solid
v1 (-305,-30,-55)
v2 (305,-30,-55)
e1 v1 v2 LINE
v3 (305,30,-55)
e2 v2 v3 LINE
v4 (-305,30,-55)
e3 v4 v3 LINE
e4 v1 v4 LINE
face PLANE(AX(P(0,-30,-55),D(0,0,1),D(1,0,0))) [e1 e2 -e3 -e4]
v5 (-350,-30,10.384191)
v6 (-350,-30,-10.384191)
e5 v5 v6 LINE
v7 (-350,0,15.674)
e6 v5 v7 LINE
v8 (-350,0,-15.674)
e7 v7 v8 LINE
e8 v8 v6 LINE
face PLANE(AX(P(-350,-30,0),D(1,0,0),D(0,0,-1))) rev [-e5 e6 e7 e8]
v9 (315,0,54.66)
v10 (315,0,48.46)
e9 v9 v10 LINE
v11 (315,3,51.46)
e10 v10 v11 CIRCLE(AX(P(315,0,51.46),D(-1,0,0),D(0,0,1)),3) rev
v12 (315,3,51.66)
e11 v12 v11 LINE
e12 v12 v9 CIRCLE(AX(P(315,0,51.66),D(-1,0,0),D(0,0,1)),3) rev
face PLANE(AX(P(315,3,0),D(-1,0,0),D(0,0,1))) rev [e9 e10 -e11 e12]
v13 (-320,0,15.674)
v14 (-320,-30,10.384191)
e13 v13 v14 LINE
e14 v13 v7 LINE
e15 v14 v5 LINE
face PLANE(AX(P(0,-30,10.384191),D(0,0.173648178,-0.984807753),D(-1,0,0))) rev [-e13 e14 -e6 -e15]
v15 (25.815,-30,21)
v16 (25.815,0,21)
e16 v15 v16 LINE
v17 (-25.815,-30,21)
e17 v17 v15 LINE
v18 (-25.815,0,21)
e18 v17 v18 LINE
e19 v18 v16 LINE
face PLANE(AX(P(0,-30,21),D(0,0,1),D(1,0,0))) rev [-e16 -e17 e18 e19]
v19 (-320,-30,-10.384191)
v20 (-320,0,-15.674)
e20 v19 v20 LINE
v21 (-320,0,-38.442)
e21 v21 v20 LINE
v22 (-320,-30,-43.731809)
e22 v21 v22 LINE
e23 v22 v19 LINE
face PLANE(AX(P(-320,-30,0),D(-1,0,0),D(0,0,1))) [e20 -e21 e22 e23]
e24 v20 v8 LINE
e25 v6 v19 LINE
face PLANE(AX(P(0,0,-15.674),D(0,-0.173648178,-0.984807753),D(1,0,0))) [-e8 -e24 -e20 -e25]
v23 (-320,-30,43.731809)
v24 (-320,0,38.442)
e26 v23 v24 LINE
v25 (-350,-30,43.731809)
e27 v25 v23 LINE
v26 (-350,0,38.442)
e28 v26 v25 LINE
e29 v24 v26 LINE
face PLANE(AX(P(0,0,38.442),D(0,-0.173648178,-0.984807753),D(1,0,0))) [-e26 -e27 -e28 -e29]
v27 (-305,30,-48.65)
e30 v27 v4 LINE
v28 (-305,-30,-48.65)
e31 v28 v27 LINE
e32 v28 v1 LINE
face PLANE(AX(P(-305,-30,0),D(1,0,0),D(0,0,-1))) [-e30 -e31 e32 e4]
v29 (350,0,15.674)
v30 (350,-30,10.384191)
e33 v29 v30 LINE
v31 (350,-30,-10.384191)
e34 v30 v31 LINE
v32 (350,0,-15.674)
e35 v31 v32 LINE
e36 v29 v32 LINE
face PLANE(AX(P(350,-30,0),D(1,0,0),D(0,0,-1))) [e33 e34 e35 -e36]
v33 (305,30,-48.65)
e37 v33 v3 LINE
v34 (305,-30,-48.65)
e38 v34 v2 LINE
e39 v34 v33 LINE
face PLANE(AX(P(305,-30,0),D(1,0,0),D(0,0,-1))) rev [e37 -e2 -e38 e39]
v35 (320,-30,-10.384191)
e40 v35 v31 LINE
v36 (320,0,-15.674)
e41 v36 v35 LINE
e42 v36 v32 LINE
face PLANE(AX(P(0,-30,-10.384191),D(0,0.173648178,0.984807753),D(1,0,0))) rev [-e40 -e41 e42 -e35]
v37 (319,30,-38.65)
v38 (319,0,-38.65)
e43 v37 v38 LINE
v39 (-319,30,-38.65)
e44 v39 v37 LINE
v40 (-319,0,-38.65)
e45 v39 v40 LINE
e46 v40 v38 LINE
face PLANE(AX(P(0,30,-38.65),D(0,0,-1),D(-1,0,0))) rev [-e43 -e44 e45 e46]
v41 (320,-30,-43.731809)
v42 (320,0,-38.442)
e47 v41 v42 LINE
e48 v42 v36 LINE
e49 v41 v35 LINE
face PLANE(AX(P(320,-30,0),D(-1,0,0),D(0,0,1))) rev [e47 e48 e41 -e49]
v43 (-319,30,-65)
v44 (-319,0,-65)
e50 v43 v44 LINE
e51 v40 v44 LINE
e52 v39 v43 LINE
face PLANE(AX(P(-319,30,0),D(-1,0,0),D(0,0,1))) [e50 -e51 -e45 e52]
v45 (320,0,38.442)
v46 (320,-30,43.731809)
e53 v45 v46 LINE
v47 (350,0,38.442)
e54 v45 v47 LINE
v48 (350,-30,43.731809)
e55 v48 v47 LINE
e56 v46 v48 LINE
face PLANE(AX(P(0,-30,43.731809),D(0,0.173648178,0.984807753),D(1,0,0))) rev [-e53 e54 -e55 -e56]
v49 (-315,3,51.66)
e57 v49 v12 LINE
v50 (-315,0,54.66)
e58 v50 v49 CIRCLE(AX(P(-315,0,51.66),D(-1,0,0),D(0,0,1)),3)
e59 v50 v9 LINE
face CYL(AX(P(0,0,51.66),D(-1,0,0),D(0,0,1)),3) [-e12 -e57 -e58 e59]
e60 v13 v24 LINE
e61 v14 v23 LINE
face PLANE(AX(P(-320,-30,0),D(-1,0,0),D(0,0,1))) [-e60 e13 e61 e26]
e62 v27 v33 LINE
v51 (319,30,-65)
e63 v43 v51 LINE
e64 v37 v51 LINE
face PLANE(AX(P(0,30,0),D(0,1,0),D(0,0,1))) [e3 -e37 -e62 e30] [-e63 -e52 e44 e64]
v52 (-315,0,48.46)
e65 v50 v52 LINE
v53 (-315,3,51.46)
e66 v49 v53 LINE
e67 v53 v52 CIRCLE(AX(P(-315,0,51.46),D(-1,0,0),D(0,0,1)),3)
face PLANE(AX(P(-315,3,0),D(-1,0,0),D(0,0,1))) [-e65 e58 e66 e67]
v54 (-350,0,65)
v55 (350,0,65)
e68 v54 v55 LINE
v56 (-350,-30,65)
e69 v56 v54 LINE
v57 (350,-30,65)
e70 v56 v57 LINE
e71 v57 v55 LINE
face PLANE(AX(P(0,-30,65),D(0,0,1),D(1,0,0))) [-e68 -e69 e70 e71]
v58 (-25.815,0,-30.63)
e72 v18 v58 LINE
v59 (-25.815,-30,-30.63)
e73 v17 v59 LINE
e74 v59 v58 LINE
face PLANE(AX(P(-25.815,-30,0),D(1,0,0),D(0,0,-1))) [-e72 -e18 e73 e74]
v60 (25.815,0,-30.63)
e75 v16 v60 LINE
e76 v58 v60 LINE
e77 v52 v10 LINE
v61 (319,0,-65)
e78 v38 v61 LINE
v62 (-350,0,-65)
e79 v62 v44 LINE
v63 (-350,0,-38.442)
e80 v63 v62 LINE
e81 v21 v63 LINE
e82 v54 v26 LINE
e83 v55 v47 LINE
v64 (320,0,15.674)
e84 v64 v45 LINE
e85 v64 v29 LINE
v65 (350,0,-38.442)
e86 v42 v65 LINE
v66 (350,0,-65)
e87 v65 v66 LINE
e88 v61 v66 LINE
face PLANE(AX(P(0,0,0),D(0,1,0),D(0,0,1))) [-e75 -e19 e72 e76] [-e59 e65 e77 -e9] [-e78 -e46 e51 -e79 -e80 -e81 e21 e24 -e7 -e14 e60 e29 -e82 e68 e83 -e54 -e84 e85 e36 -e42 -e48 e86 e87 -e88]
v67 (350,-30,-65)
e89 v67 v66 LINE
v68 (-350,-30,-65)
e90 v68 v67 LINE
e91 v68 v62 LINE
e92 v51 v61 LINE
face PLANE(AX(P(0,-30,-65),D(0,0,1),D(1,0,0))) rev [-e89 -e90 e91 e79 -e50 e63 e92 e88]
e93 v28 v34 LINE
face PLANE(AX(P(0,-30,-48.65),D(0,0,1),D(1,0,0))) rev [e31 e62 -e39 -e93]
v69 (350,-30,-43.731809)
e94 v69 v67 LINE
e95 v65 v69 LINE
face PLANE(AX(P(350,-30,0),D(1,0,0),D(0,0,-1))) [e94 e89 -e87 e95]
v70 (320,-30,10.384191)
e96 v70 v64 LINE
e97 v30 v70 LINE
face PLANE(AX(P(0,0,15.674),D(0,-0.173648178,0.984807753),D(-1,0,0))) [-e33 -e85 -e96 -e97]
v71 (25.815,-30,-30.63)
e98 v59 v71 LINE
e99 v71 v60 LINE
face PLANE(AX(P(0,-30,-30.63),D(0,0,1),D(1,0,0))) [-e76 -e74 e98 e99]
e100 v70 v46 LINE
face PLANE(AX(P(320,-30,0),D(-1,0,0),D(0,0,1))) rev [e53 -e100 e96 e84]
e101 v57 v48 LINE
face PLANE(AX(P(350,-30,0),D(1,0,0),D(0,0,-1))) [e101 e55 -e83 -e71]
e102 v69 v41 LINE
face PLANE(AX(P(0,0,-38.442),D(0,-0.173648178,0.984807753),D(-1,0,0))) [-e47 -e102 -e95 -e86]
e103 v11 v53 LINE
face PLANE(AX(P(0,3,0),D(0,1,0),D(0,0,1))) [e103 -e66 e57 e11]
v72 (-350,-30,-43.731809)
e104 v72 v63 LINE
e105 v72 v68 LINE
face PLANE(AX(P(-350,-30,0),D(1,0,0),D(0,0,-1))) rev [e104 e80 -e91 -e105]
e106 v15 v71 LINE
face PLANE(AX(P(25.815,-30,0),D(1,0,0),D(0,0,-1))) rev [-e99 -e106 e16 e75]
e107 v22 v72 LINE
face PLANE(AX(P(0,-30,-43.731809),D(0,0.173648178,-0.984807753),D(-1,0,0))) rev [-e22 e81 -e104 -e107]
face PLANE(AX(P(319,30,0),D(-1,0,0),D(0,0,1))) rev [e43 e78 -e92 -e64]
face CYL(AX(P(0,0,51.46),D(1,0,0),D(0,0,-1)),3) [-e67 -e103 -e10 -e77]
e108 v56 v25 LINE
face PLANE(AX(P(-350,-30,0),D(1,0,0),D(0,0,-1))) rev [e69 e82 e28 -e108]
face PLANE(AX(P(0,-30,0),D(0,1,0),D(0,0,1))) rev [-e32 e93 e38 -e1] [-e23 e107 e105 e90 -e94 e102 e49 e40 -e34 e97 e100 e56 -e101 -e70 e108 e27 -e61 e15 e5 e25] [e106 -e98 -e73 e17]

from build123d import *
from OCP.BRepFilletAPI import BRepFilletAPI_MakeChamfer

# Parameters (mm, degrees)
SKETCH2_W           = 51.63
SKETCH2_H           = 51.63
SKETCH2_W_2         = 610
SKETCH2_H_2         = 6.35
BOSS_EXTRUDE1_DEPTH = 30
SKETCH2_4_W         = 630
SKETCH2_4_H         = 6.2
BOSS_EXTRUDE3_DEPTH = 3
FILLET2_R           = 3
CHAMFER1_SIZE       = 30
CHAMFER1_SIZE_2     = 5.289809421
CHAMFER2_SIZE       = 30
CHAMFER2_SIZE_2     = 5.289809421
SKETCH2_7_W         = 638
SKETCH2_7_H         = 26.35
SKETCH2_7_W_2       = 610
SKETCH2_7_H_2       = 6.35
BOSS_EXTRUDE5_DEPTH = 30


with BuildPart() as part:
    # Sketch2 → Boss-Extrude1 (new body)
    with BuildSketch(Plane(origin=(0, 0, 0), x_dir=(1, 0, 0), z_dir=(0, 1, 0))):
        Polygon((-350, -38.442), (-350, -65), (350, -65), (350, -38.442), (320, -38.442), (320, -15.674), (350, -15.674), (350, 15.674), (320, 15.674), (320, 38.442), (350, 38.442), (350, 65), (-350, 65), (-350, 38.442), (-320, 38.442), (-320, 15.674), (-350, 15.674), (-350, -15.674), (-320, -15.674), (-320, -38.442), align=None)
        with Locations((0, 4.815)):
            Rectangle(SKETCH2_W, SKETCH2_H, mode=Mode.SUBTRACT)
        with Locations((0, 51.825)):
            Rectangle(SKETCH2_W_2, SKETCH2_H_2, mode=Mode.SUBTRACT)
    extrude(amount=-BOSS_EXTRUDE1_DEPTH)

    # Sketch2<4> → Boss-Extrude3 (add)
    with BuildSketch(Plane(origin=(0, 0, 0), x_dir=(1, 0, 0), z_dir=(0, 1, 0))):
        with Locations((0, -51.56)):
            Rectangle(SKETCH2_4_W, SKETCH2_4_H)
    extrude(amount=BOSS_EXTRUDE3_DEPTH)

    # Fillet2
    fillet2_edges = [part.edges().sort_by_distance(p)[0] for p in [
        (0, 3, 48.46),
        (0, 3, 54.66),
    ]]
    fillet(fillet2_edges, radius=FILLET2_R - 0.0001)  # a hair under: the kernel refuses the full size

    # Chamfer1
    chamfer1_edges_1 = [part.edges().sort_by_distance(p)[0] for p in [
        (-335, -30, 15.674),
    ]]
    chamfer1_side_1 = [part.faces().sort_by_distance(p)[0] for p in [
        (-335, -29.894203812, 15.674),
    ]]
    chamfer1_edges_2 = [part.edges().sort_by_distance(p)[0] for p in [
        (-335, -30, -38.442),
    ]]
    chamfer1_side_2 = [part.faces().sort_by_distance(p)[0] for p in [
        (-335, -29.894203812, -38.442),
    ]]
    chamfer1_edges_3 = [part.edges().sort_by_distance(p)[0] for p in [
        (335, -30, -15.674),
    ]]
    chamfer1_side_3 = [part.faces().sort_by_distance(p)[0] for p in [
        (335, -29.894203812, -15.674),
    ]]
    chamfer1_edges_4 = [part.edges().sort_by_distance(p)[0] for p in [
        (335, -30, 38.442),
    ]]
    chamfer1_side_4 = [part.faces().sort_by_distance(p)[0] for p in [
        (335, -29.894203812, 38.442),
    ]]
    chamfer1 = BRepFilletAPI_MakeChamfer(part.part.solid().wrapped)
    for e in chamfer1_edges_1:
        chamfer1.Add(CHAMFER1_SIZE - 0.0001, CHAMFER1_SIZE_2 - 0.0001, e.wrapped, chamfer1_side_1[0].wrapped)
    for e in chamfer1_edges_2:
        chamfer1.Add(CHAMFER1_SIZE - 0.0001, CHAMFER1_SIZE_2 - 0.0001, e.wrapped, chamfer1_side_2[0].wrapped)
    for e in chamfer1_edges_3:
        chamfer1.Add(CHAMFER1_SIZE - 0.0001, CHAMFER1_SIZE_2 - 0.0001, e.wrapped, chamfer1_side_3[0].wrapped)
    for e in chamfer1_edges_4:
        chamfer1.Add(CHAMFER1_SIZE - 0.0001, CHAMFER1_SIZE_2 - 0.0001, e.wrapped, chamfer1_side_4[0].wrapped)
    add(Compound.cast(chamfer1.Shape()), mode=Mode.REPLACE)  # a hair under: the kernel refuses the full size

    # Chamfer2
    chamfer2_edges_1 = [part.edges().sort_by_distance(p)[0] for p in [
        (-335, -30, 38.442),
    ]]
    chamfer2_side_1 = [part.faces().sort_by_distance(p)[0] for p in [
        (-335, -29.894203812, 38.442),
    ]]
    chamfer2_edges_2 = [part.edges().sort_by_distance(p)[0] for p in [
        (-335, -30, -15.674),
    ]]
    chamfer2_side_2 = [part.faces().sort_by_distance(p)[0] for p in [
        (-335, -29.894203812, -15.674),
    ]]
    chamfer2_edges_3 = [part.edges().sort_by_distance(p)[0] for p in [
        (335, -30, -38.442),
    ]]
    chamfer2_side_3 = [part.faces().sort_by_distance(p)[0] for p in [
        (335, -29.894203812, -38.442),
    ]]
    chamfer2_edges_4 = [part.edges().sort_by_distance(p)[0] for p in [
        (335, -30, 15.674),
    ]]
    chamfer2_side_4 = [part.faces().sort_by_distance(p)[0] for p in [
        (335, -29.894203812, 15.674),
    ]]
    chamfer2 = BRepFilletAPI_MakeChamfer(part.part.solid().wrapped)
    for e in chamfer2_edges_1:
        chamfer2.Add(CHAMFER2_SIZE - 0.0001, CHAMFER2_SIZE_2 - 0.0001, e.wrapped, chamfer2_side_1[0].wrapped)
    for e in chamfer2_edges_2:
        chamfer2.Add(CHAMFER2_SIZE - 0.0001, CHAMFER2_SIZE_2 - 0.0001, e.wrapped, chamfer2_side_2[0].wrapped)
    for e in chamfer2_edges_3:
        chamfer2.Add(CHAMFER2_SIZE - 0.0001, CHAMFER2_SIZE_2 - 0.0001, e.wrapped, chamfer2_side_3[0].wrapped)
    for e in chamfer2_edges_4:
        chamfer2.Add(CHAMFER2_SIZE - 0.0001, CHAMFER2_SIZE_2 - 0.0001, e.wrapped, chamfer2_side_4[0].wrapped)
    add(Compound.cast(chamfer2.Shape()), mode=Mode.REPLACE)  # a hair under: the kernel refuses the full size

    # Sketch2<7> → Boss-Extrude5 (add)
    with BuildSketch(Plane(origin=(0, 0, 0), x_dir=(1, 0, 0), z_dir=(0, 1, 0))):
        with Locations((0, 51.825)):
            Rectangle(SKETCH2_7_W, SKETCH2_7_H)
        with Locations((0, 51.825)):
            Rectangle(SKETCH2_7_W_2, SKETCH2_7_H_2, mode=Mode.SUBTRACT)
    extrude(amount=BOSS_EXTRUDE5_DEPTH)


solid = part.part
